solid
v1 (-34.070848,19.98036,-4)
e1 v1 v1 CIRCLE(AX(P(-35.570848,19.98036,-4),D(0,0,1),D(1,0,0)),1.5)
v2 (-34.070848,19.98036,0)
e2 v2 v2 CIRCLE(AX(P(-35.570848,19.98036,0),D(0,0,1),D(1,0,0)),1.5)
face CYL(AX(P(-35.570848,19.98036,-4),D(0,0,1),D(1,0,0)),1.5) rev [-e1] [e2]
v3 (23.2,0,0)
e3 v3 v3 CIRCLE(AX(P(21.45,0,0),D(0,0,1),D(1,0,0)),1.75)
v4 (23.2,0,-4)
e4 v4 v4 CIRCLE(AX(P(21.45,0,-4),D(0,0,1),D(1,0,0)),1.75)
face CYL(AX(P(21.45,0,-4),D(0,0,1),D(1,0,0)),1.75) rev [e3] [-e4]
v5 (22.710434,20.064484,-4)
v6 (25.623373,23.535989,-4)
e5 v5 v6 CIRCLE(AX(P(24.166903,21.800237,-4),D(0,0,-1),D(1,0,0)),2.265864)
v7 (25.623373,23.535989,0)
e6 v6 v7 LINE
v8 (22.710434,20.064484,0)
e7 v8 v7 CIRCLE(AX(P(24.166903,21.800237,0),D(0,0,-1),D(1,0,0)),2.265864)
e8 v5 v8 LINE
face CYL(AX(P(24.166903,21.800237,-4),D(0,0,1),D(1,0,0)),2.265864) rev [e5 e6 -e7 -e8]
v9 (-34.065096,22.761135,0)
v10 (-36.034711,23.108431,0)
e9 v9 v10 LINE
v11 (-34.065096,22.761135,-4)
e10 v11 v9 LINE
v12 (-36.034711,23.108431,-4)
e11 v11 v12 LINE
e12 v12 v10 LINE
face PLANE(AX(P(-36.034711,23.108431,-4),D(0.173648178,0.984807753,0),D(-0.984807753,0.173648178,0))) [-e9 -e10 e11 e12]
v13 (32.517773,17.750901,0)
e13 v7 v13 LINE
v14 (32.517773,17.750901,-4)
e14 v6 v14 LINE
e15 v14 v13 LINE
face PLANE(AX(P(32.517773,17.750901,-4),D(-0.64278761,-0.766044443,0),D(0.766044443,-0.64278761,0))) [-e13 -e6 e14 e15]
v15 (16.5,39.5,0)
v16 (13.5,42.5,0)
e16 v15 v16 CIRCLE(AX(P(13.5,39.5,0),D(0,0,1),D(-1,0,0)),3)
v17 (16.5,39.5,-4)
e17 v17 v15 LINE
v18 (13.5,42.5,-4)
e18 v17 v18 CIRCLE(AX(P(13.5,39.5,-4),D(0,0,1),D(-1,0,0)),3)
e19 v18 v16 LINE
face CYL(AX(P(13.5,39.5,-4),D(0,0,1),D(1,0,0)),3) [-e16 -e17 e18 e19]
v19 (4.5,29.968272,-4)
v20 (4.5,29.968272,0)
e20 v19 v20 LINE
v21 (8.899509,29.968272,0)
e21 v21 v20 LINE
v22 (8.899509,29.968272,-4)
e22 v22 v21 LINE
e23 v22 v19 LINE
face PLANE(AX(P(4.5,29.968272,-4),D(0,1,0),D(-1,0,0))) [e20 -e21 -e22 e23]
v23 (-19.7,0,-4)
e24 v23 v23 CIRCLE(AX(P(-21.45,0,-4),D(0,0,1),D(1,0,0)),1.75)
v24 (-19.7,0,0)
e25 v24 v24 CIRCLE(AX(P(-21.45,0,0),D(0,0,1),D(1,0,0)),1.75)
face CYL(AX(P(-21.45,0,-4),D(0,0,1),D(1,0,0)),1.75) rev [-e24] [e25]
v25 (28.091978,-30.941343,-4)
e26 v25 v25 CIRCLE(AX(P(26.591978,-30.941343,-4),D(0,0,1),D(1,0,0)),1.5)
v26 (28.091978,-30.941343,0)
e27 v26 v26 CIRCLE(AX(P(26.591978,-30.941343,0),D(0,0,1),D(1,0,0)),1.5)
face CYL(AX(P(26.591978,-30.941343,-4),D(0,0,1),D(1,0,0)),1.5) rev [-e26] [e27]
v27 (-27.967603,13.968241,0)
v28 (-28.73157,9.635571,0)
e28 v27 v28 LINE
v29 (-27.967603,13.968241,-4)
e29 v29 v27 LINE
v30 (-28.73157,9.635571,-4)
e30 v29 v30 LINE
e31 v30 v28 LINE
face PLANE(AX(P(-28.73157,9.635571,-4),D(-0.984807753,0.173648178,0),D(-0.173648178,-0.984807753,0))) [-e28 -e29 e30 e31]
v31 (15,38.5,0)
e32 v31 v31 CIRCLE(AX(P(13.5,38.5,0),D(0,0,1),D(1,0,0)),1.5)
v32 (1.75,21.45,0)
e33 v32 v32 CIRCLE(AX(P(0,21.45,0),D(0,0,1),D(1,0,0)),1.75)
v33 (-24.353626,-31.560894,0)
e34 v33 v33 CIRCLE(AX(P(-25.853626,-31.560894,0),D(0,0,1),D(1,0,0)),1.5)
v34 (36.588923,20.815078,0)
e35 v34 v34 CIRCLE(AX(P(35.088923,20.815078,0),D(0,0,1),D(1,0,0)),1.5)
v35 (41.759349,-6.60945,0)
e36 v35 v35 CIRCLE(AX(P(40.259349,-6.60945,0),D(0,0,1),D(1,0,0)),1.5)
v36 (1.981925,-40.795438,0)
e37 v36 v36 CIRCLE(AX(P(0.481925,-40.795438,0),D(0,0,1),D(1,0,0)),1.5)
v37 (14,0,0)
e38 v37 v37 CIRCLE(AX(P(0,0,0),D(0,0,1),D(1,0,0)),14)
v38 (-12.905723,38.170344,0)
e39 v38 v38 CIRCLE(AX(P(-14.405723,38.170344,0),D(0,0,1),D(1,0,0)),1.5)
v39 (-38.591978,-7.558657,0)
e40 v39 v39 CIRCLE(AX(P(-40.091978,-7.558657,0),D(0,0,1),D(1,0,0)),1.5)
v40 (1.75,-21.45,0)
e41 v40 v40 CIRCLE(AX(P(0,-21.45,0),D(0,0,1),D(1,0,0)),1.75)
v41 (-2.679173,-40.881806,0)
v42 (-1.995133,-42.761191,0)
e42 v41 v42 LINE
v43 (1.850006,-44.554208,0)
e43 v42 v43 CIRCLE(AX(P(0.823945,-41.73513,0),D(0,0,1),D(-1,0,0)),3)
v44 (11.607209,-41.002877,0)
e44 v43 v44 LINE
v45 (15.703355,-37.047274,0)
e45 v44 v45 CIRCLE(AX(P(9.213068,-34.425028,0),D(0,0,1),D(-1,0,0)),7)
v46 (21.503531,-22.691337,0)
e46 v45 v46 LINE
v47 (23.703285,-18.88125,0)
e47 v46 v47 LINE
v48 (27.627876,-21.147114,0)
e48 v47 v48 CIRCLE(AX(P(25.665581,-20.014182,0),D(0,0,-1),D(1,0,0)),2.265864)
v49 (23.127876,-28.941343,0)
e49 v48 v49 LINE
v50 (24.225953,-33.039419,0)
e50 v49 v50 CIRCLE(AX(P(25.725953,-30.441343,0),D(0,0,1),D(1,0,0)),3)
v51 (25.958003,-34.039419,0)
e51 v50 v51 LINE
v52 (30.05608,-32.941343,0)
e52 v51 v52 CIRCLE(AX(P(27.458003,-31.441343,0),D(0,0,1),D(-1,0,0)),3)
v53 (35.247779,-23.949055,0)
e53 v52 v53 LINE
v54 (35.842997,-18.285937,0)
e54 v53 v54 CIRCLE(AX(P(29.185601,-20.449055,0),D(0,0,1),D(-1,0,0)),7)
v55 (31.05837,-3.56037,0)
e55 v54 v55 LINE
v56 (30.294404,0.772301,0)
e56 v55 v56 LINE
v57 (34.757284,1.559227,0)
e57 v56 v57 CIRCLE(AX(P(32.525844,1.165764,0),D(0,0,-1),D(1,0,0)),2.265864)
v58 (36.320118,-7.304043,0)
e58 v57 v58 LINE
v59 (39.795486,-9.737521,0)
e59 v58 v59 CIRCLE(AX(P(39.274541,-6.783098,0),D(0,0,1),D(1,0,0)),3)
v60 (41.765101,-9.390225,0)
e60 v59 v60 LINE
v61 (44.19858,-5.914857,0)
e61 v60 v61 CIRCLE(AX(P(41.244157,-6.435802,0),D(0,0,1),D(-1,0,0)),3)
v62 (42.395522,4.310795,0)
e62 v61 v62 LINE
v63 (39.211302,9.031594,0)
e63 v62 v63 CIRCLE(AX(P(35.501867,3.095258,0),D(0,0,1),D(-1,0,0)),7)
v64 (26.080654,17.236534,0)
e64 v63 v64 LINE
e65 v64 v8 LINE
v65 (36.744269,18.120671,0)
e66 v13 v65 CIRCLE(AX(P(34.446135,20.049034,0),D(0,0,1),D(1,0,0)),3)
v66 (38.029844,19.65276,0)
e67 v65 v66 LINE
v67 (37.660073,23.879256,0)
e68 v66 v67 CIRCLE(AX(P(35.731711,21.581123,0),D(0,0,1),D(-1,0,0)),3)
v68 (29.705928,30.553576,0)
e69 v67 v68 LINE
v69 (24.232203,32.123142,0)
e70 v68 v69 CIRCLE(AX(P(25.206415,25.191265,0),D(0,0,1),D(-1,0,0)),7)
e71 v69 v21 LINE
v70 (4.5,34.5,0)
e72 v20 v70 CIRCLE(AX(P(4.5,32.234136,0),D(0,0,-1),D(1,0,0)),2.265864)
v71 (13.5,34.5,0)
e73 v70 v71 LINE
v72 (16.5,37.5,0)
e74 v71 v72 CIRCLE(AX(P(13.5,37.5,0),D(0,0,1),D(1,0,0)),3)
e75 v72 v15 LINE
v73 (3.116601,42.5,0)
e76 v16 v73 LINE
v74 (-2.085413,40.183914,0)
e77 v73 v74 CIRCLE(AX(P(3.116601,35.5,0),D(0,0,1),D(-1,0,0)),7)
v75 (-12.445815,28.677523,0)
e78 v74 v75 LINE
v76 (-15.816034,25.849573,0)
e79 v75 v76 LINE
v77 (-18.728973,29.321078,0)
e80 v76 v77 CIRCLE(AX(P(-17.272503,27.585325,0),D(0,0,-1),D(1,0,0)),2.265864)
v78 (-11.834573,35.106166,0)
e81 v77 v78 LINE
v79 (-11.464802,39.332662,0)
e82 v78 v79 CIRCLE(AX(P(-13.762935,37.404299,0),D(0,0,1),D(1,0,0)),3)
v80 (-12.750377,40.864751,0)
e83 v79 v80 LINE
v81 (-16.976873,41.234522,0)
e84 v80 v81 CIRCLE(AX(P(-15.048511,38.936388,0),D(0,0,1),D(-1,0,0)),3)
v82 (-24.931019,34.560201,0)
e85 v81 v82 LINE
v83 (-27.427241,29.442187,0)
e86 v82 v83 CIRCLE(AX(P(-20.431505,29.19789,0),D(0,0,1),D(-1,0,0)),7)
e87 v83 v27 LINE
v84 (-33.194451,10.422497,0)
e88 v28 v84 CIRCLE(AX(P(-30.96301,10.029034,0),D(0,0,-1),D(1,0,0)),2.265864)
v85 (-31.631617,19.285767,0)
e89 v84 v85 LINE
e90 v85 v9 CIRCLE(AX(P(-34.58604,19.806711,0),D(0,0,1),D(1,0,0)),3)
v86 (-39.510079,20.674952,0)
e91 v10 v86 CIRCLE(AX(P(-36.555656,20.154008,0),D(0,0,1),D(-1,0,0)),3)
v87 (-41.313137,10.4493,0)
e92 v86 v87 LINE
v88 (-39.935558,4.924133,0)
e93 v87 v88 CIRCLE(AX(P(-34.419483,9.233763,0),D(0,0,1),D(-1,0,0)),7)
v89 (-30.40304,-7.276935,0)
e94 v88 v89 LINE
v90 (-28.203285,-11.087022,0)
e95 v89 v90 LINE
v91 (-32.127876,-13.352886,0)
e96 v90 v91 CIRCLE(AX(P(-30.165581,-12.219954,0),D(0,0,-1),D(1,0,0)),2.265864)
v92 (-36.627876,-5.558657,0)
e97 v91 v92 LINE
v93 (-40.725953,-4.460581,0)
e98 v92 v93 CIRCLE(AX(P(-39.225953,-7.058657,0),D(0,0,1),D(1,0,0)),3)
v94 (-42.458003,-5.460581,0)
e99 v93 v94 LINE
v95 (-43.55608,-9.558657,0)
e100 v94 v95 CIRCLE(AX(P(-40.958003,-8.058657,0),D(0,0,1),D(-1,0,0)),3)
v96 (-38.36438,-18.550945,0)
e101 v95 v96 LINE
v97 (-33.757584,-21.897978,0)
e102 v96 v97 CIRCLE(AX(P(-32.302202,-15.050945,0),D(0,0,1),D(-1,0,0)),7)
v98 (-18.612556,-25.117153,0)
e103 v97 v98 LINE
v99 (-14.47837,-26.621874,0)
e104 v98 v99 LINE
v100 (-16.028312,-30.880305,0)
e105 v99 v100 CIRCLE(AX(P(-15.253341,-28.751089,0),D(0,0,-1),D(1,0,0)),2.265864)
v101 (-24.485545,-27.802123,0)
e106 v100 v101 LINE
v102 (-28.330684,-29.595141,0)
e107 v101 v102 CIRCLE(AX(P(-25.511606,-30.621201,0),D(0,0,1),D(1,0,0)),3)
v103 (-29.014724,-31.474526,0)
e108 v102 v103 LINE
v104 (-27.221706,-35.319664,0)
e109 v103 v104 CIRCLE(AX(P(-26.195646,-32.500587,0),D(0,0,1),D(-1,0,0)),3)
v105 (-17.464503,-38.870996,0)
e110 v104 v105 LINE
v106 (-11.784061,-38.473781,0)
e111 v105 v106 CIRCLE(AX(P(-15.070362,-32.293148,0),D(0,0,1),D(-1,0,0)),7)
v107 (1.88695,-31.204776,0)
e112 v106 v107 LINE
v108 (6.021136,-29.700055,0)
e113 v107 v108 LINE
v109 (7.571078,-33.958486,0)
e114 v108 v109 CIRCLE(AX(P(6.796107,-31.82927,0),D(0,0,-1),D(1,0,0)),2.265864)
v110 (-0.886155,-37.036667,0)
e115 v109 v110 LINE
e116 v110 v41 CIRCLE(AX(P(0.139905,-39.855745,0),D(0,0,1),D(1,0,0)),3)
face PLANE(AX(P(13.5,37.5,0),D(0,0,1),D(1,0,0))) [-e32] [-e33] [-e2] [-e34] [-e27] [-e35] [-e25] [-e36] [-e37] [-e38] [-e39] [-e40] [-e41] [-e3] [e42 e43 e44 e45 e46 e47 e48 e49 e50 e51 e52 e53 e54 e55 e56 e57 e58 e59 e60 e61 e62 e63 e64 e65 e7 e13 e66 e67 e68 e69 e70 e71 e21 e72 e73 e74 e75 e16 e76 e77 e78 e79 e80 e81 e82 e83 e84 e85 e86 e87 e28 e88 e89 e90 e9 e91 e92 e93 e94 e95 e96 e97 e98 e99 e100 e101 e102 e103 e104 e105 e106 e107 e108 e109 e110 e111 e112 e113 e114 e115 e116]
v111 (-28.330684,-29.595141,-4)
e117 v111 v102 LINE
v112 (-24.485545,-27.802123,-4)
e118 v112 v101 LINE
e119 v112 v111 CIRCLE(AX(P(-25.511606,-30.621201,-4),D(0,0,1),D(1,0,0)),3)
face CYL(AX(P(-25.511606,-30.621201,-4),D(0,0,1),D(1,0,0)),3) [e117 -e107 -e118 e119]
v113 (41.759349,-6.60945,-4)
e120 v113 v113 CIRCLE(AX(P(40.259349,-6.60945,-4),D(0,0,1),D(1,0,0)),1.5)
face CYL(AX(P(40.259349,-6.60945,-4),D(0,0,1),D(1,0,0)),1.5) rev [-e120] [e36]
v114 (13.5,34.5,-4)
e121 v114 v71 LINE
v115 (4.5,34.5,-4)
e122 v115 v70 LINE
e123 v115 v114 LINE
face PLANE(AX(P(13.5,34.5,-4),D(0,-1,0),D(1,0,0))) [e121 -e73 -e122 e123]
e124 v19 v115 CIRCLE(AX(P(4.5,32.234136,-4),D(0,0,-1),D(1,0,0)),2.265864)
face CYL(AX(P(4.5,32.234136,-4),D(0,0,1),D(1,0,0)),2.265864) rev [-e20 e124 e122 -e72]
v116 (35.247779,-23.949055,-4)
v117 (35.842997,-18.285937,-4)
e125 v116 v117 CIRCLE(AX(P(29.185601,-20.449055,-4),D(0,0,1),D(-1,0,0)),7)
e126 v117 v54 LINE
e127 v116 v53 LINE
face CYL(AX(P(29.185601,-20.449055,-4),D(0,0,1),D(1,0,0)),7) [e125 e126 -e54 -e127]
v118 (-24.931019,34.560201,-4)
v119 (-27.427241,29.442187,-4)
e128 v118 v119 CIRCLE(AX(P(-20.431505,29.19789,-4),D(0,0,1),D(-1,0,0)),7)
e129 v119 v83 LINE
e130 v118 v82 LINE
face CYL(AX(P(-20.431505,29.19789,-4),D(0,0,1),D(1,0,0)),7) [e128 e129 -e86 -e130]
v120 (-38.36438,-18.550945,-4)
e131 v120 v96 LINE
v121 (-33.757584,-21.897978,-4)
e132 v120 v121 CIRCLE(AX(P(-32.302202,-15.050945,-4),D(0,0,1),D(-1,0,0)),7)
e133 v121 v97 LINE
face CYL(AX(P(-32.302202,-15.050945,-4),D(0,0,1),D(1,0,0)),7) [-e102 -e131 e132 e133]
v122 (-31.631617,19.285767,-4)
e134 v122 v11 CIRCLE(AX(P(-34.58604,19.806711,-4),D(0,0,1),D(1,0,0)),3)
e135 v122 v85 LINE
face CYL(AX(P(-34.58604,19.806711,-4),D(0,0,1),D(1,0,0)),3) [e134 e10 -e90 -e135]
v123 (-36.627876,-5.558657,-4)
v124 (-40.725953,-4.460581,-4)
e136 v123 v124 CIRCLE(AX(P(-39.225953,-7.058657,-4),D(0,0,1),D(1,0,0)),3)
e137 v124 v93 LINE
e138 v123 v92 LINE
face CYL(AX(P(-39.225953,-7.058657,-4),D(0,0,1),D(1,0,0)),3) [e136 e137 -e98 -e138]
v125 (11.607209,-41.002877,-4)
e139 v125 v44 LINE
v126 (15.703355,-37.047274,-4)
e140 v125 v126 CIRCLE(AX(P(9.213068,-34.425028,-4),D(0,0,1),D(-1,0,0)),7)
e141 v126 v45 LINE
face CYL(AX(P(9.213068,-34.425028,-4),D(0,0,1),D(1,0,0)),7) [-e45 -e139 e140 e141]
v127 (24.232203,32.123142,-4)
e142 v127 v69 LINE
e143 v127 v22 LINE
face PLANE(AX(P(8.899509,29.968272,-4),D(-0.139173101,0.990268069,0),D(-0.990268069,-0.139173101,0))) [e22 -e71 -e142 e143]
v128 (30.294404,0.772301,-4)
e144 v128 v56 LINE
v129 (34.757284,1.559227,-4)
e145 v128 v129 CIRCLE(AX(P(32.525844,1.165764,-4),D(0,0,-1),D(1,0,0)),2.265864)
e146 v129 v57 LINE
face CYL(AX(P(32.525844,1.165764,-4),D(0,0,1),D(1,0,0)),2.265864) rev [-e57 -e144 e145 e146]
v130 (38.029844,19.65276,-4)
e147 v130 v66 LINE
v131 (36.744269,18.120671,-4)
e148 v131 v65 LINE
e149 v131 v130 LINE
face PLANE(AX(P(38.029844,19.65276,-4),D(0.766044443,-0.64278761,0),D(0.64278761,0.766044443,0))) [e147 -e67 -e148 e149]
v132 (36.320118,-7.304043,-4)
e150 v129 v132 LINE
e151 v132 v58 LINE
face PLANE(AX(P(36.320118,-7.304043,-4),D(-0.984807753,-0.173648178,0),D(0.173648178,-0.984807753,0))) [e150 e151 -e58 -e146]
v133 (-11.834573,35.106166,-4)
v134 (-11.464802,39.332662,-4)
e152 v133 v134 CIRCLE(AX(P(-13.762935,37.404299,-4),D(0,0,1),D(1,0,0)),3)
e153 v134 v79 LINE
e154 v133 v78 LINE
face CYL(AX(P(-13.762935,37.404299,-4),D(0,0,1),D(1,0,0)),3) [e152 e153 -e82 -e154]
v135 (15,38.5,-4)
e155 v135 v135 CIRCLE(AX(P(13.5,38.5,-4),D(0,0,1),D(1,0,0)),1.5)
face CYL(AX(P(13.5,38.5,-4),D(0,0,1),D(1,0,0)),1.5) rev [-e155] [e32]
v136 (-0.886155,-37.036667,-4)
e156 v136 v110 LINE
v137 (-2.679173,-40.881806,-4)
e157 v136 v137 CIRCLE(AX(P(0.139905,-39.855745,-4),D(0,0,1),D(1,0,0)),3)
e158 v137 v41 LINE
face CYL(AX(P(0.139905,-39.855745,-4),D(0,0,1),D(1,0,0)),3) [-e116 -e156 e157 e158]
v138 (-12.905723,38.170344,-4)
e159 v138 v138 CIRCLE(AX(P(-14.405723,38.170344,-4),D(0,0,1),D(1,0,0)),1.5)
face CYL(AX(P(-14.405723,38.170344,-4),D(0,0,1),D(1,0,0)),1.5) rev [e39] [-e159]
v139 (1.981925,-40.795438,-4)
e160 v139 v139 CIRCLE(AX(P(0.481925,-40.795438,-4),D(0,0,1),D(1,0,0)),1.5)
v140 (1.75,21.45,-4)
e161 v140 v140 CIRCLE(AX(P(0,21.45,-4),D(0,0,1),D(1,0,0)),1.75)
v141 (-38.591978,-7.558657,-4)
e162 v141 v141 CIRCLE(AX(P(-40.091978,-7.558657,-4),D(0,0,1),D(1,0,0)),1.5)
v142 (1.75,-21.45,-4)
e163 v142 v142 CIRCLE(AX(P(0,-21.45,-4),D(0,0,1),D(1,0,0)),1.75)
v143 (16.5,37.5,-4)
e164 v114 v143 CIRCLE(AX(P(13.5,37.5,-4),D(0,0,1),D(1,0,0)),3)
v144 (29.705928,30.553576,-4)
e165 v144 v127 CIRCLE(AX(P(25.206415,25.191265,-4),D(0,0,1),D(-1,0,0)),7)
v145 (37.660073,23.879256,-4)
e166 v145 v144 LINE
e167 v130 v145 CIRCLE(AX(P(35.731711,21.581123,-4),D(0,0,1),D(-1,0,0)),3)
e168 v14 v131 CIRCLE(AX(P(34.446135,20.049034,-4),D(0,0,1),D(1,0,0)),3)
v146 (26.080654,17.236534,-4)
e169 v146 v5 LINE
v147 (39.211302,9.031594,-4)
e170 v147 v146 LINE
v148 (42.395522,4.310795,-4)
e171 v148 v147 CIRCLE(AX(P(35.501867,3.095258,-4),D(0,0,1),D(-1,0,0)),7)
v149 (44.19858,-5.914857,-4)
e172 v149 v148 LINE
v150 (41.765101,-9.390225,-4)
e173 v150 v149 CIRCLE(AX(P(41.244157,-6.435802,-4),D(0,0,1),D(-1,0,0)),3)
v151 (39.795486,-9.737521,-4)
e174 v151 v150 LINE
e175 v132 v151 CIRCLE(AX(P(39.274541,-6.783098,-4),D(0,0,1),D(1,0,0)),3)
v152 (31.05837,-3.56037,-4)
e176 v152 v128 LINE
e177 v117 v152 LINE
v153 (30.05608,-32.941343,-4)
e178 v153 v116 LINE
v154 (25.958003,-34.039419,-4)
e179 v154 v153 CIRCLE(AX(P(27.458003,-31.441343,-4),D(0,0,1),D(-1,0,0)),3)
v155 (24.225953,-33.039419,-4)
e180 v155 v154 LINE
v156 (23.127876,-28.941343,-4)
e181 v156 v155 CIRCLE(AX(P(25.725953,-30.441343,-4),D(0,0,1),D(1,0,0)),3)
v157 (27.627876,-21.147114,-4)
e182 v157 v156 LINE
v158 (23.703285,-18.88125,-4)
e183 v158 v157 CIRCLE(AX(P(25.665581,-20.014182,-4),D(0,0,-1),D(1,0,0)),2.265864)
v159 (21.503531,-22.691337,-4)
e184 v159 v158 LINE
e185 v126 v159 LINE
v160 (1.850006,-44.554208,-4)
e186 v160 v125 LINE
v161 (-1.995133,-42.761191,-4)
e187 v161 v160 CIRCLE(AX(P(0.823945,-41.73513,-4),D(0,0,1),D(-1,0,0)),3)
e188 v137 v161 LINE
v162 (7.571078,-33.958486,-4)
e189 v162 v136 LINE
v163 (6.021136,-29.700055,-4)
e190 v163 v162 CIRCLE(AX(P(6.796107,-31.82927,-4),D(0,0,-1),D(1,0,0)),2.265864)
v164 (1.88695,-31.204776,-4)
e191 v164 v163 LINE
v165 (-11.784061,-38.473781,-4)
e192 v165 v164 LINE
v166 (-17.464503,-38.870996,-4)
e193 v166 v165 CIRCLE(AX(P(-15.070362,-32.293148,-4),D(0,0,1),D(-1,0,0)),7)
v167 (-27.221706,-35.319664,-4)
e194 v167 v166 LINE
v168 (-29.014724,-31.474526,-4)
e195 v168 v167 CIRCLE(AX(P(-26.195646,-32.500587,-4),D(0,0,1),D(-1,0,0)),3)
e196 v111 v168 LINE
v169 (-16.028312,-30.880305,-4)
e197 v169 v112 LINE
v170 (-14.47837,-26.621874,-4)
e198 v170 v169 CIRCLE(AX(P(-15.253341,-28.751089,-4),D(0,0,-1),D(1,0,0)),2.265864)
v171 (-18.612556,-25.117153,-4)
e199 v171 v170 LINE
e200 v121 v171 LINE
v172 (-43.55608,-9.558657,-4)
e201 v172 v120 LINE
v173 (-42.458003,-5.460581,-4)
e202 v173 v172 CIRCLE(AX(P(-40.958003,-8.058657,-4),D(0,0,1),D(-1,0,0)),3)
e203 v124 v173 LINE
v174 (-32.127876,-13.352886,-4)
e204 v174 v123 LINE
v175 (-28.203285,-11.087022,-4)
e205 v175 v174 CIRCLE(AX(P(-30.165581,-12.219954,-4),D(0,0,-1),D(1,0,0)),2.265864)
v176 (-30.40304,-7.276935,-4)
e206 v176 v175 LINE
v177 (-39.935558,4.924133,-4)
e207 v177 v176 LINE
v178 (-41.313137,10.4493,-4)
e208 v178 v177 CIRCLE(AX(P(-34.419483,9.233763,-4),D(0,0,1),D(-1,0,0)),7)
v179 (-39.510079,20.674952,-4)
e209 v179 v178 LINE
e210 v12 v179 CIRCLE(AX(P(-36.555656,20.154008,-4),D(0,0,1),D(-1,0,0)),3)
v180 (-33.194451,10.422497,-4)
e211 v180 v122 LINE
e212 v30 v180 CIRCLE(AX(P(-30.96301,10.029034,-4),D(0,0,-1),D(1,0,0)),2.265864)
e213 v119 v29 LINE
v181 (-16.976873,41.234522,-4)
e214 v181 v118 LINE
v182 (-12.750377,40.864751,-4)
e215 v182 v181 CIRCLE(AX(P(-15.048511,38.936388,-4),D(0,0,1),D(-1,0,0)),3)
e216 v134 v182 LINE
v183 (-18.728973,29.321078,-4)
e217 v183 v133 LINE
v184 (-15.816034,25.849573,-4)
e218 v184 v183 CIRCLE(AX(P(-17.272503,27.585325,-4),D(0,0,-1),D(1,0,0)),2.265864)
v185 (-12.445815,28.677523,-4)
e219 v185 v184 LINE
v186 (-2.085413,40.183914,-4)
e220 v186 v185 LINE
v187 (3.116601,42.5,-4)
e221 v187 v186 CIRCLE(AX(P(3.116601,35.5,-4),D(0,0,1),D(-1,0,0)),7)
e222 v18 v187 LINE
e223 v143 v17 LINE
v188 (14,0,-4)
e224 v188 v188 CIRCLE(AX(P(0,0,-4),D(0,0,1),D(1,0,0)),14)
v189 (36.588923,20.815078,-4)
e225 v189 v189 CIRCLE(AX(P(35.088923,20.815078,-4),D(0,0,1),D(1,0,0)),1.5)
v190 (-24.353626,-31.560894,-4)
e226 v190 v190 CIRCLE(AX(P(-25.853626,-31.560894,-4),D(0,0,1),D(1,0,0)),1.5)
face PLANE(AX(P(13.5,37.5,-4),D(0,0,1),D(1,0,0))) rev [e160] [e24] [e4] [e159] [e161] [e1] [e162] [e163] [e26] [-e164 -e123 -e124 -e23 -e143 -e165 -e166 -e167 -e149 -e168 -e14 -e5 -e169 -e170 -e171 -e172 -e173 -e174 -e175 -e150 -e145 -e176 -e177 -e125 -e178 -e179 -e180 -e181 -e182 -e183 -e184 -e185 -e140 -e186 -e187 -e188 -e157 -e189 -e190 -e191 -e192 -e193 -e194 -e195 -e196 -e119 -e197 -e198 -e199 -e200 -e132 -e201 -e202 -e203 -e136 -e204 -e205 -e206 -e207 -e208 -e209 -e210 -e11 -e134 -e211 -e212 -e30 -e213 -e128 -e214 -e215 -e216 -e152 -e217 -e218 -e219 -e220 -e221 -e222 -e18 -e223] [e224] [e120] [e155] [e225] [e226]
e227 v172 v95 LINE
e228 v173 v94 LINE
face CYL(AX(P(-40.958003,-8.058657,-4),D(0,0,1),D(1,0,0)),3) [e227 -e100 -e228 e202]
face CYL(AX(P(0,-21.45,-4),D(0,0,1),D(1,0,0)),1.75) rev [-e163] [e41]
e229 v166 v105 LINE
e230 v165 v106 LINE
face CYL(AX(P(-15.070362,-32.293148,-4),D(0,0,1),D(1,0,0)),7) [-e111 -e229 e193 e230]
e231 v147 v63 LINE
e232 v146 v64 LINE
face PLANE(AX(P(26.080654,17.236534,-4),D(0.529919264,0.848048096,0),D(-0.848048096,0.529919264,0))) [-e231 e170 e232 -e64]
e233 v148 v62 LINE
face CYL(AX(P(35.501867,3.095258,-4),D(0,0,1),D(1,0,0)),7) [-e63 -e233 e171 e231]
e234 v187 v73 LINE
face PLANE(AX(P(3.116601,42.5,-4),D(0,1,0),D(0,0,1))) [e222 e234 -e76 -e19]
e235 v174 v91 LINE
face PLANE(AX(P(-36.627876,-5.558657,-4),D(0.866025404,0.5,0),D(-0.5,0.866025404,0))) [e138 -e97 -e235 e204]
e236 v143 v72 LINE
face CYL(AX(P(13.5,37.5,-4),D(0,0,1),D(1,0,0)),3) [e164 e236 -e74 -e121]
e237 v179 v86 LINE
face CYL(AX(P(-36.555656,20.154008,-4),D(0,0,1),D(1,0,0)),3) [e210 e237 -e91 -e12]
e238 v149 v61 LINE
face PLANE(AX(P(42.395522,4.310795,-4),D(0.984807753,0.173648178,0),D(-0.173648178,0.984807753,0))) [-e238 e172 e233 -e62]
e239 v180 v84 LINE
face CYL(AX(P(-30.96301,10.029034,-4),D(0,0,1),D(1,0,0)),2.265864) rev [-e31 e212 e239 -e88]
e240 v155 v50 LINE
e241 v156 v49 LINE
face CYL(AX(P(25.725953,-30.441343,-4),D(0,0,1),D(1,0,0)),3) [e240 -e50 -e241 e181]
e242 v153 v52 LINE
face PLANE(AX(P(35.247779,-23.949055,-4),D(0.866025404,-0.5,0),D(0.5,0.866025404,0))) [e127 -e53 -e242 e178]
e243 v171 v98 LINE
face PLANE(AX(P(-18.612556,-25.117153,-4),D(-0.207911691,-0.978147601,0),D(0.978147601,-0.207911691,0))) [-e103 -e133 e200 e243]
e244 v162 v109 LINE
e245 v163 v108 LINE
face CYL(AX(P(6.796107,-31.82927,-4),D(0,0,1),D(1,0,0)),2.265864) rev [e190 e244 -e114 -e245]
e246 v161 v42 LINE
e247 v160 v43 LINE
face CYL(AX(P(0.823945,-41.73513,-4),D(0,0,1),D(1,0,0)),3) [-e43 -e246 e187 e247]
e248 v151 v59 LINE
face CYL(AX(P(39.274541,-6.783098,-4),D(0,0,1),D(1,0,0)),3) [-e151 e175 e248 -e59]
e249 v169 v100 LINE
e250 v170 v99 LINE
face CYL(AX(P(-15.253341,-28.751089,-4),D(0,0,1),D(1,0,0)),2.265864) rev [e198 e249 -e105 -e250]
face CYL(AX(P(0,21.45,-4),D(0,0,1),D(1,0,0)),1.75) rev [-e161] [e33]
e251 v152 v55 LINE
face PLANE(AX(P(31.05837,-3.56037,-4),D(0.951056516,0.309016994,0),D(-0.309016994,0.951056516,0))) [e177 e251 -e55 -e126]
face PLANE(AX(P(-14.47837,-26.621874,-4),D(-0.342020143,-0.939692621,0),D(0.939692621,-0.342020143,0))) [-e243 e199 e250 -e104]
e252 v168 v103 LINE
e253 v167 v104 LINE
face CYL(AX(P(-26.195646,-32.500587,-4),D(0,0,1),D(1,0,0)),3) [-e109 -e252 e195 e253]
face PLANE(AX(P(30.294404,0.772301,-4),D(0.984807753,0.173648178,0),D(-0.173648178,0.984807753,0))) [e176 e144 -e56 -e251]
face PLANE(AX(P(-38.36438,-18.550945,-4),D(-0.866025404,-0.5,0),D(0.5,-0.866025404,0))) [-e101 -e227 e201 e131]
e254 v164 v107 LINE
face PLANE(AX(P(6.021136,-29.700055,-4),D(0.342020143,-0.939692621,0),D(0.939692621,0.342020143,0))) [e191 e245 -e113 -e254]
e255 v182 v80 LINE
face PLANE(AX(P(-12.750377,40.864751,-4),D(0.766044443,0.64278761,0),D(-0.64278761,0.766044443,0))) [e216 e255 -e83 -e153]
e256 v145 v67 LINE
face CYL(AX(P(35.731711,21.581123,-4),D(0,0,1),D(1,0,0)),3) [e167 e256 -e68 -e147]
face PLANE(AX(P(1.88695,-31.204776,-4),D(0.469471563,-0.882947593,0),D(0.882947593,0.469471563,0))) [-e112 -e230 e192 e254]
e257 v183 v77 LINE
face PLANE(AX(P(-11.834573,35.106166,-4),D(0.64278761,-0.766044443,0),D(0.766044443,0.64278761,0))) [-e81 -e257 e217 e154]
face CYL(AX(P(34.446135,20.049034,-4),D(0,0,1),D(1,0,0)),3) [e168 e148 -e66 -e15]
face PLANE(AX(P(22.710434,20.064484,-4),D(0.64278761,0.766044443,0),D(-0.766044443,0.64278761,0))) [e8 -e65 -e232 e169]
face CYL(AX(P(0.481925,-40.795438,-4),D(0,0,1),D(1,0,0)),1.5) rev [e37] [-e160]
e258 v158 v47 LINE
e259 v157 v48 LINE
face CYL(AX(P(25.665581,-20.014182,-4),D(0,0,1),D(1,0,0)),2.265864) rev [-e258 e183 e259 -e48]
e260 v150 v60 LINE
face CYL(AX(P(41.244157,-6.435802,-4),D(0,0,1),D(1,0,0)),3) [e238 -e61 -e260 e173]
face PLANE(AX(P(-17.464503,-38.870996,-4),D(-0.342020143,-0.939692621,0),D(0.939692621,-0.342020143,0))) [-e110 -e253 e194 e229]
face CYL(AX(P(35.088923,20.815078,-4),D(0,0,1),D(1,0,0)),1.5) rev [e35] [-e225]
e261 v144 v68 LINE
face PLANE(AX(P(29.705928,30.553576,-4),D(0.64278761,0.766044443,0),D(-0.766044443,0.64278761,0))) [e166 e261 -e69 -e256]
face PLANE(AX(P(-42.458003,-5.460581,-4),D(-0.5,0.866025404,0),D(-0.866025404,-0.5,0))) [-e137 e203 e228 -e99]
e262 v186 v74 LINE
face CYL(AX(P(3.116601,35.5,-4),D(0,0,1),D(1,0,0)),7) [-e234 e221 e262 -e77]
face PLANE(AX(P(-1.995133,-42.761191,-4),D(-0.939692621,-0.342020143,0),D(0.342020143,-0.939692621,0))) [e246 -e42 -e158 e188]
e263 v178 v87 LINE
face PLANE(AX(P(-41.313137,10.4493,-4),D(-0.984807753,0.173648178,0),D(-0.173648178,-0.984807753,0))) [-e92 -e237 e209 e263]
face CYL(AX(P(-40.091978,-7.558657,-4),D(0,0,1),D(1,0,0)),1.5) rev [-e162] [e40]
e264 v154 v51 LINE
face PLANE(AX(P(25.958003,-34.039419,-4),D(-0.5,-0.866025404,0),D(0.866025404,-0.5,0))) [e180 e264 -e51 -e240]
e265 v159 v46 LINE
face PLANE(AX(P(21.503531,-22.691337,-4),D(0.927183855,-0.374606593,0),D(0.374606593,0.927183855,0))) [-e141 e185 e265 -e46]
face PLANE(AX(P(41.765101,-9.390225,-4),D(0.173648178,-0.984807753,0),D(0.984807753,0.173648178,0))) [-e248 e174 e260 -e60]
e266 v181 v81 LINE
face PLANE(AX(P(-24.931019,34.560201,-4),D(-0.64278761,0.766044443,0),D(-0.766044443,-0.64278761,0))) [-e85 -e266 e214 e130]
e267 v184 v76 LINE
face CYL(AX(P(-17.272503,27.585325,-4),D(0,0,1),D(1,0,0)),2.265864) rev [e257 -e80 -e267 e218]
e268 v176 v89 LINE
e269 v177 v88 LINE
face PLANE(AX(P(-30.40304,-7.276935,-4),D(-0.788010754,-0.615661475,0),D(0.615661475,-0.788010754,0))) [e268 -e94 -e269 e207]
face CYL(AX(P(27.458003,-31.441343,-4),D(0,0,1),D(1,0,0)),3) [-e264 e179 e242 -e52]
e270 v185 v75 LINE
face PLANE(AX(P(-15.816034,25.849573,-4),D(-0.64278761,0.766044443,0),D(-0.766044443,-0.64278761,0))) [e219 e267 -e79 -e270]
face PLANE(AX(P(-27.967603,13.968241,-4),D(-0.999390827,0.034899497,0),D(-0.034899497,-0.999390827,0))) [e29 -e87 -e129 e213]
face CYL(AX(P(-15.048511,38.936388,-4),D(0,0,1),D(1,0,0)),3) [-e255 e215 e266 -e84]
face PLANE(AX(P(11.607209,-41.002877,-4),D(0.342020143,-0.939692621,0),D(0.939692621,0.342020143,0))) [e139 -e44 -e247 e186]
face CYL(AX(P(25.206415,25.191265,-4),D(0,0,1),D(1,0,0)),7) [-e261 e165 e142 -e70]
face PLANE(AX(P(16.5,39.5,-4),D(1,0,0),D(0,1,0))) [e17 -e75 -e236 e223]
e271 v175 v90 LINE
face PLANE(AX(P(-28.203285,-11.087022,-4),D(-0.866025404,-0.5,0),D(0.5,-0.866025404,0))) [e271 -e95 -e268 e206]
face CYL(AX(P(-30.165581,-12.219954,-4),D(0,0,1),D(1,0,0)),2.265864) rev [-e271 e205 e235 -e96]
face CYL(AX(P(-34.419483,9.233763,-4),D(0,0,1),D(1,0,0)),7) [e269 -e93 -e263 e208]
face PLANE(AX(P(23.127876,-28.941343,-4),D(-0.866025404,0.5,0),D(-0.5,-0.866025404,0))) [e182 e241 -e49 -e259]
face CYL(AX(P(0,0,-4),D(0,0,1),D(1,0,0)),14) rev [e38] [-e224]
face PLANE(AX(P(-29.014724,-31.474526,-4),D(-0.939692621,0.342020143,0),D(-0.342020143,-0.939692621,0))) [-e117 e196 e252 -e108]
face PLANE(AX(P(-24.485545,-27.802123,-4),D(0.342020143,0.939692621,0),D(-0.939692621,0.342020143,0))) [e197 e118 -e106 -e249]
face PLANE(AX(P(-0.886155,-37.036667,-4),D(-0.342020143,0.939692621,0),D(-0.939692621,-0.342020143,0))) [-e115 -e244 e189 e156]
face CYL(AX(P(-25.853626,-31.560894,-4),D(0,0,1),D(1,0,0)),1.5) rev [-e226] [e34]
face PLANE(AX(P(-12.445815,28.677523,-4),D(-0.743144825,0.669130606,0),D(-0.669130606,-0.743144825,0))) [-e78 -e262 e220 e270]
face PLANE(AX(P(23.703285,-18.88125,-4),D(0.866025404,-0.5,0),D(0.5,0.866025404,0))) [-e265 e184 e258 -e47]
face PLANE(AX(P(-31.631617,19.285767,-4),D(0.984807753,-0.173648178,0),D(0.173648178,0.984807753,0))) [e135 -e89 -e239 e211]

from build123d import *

# Parameters (mm, degrees)
SKETCH1_R          = 14
SKETCH1_R_2        = 1.75
SKETCH1_R_3        = 1.5
BASE_FLANGE1_DEPTH = 4


# Sheet-metal steps are written as plain solids
with BuildPart() as part:
    # Sketch1 → Base-Flange1 (new body)
    with BuildSketch(Plane.XY):
        with BuildLine():
            Line((-12.445814591, 28.677522558), (-2.085412981, 40.183914245))
            ThreePointArc((-2.085412981, 40.183914245), (0.269444296, 41.894818203), (3.116600797, 42.5))
            Line((3.116600797, 42.5), (13.5, 42.5))
            ThreePointArc((13.5, 42.5), (15.621320344, 41.621320344), (16.5, 39.5))
            Line((16.5, 39.5), (16.5, 37.5))
            ThreePointArc((16.5, 37.5), (15.621320344, 35.378679656), (13.5, 34.5))
            Line((13.5, 34.5), (4.5, 34.5))
            ThreePointArc((4.5, 34.5), (2.234136105, 32.234136105), (4.5, 29.96827221))
            Line((4.5, 29.96827221), (8.899509069, 29.96827221))
            Line((8.899509069, 29.96827221), (24.232203159, 32.123141835))
            ThreePointArc((24.232203159, 32.123141835), (27.135876357, 31.920097226), (29.705928134, 30.553576456))
            Line((29.705928134, 30.553576456), (37.660073394, 23.879256102))
            ThreePointArc((37.660073394, 23.879256102), (38.720294659, 21.842590001), (38.029843894, 19.652759943))
            Line((38.029843894, 19.652759943), (36.744268675, 18.120671057))
            ThreePointArc((36.744268675, 18.120671057), (34.707602574, 17.060449792), (32.517772516, 17.750900557))
            Line((32.517772516, 17.750900557), (25.623372528, 23.535989044))
            ThreePointArc((25.623372528, 23.535989044), (22.431150845, 23.256705835), (22.710434054, 20.064484152))
            Line((22.710434054, 20.064484152), (26.080653529, 17.236534234))
            Line((26.080653529, 17.236534234), (39.211302131, 9.031594352))
            ThreePointArc((39.211302131, 9.031594352), (41.305130289, 7.009608003), (42.395521552, 4.310794923))
            Line((42.395521552, 4.310794923), (44.198579902, -5.914857115))
            ThreePointArc((44.198579902, -5.914857115), (43.701612775, -8.156530957), (41.765101175, -9.390224907))
            Line((41.765101175, -9.390224907), (39.795485669, -9.737521262))
            ThreePointArc((39.795485669, -9.737521262), (37.553811827, -9.240554136), (36.320117877, -7.304042536))
            Line((36.320117877, -7.304042536), (34.757284278, 1.559227241))
            ThreePointArc((34.757284278, 1.559227241), (32.132380811, 3.397204436), (30.294403616, 0.772300968))
            Line((30.294403616, 0.772300968), (31.058370348, -3.560369672))
            Line((31.058370348, -3.560369672), (35.84299705, -18.285936503))
            ThreePointArc((35.84299705, -18.285936503), (36.147254703, -21.180754707), (35.247779262, -23.949055464))
            Line((35.247779262, -23.949055464), (30.056079661, -32.941342951))
            ThreePointArc((30.056079661, -32.941342951), (28.234460585, -34.33912043), (25.958003449, -34.039419162))
            Line((25.958003449, -34.039419162), (24.225952642, -33.039419162))
            ThreePointArc((24.225952642, -33.039419162), (22.828175163, -31.217800086), (23.127876431, -28.941342951))
            Line((23.127876431, -28.941342951), (27.627876431, -21.147114317))
            ThreePointArc((27.627876431, -21.147114317), (26.798512683, -18.051886675), (23.703285041, -18.881250422))
            Line((23.703285041, -18.881250422), (21.503530506, -22.69133704))
            Line((21.503530506, -22.69133704), (15.703355299, -37.047274443))
            ThreePointArc((15.703355299, -37.047274443), (14.07567691, -39.460406892), (11.60720932, -41.002876635))
            Line((11.60720932, -41.002876635), (1.850005711, -44.554208318))
            ThreePointArc((1.850005711, -44.554208318), (-0.443909504, -44.454053817), (-1.995132582, -42.761190886))
            Line((-1.995132582, -42.761190886), (-2.679172868, -40.881805644))
            ThreePointArc((-2.679172868, -40.881805644), (-2.579018367, -38.587890429), (-0.886155436, -37.036667352))
            Line((-0.886155436, -37.036667352), (7.571078151, -33.958486062))
            ThreePointArc((7.571078151, -33.958486062), (8.925322639, -31.054299386), (6.021135963, -29.700054898))
            Line((6.021135963, -29.700054898), (1.886949755, -31.20477562))
            Line((1.886949755, -31.20477562), (-11.78406092, -38.473780937))
            ThreePointArc((-11.78406092, -38.473780937), (-14.582066543, -39.276096138), (-17.464502862, -38.870996132))
            Line((-17.464502862, -38.870996132), (-27.221706472, -35.319664448))
            ThreePointArc((-27.221706472, -35.319664448), (-28.914569403, -33.768441371), (-29.014723904, -31.474526156))
            Line((-29.014723904, -31.474526156), (-28.330683618, -29.595140915))
            ThreePointArc((-28.330683618, -29.595140915), (-26.779460541, -27.902277983), (-24.485545325, -27.802123482))
            Line((-24.485545325, -27.802123482), (-16.028311738, -30.880304772))
            ThreePointArc((-16.028311738, -30.880304772), (-13.124125062, -29.526060284), (-14.47836955, -26.621873608))
            Line((-14.47836955, -26.621873608), (-18.612555757, -25.117152886))
            Line((-18.612555757, -25.117152886), (-33.757584069, -21.897977741))
            ThreePointArc((-33.757584069, -21.897977741), (-36.416698999, -20.714063497), (-38.364380059, -18.550944536))
            Line((-38.364380059, -18.550944536), (-43.556079661, -9.558657049))
            ThreePointArc((-43.556079661, -9.558657049), (-43.855780928, -7.282199914), (-42.458003449, -5.460580838))
            Line((-42.458003449, -5.460580838), (-40.725952642, -4.460580838))
            ThreePointArc((-40.725952642, -4.460580838), (-38.449495507, -4.16087957), (-36.627876431, -5.558657049))
            Line((-36.627876431, -5.558657049), (-32.127876431, -13.352885683))
            ThreePointArc((-32.127876431, -13.352885683), (-29.032648788, -14.18224943), (-28.203285041, -11.087021788))
            Line((-28.203285041, -11.087021788), (-30.403039576, -7.27693517))
            Line((-30.403039576, -7.27693517), (-39.935558458, 4.924132608))
            ThreePointArc((-39.935558458, 4.924132608), (-41.211553267, 7.540309666), (-41.313137454, 10.449300179))
            Line((-41.313137454, 10.449300179), (-39.510079105, 20.674952217))
            ThreePointArc((-39.510079105, 20.674952217), (-38.276385155, 22.611463816), (-36.034711312, 23.108430943))
            Line((-36.034711312, 23.108430943), (-34.065095806, 22.761134587))
            ThreePointArc((-34.065095806, 22.761134587), (-32.128584207, 21.527440637), (-31.63161708, 19.285766795))
            Line((-31.63161708, 19.285766795), (-33.194450679, 10.422497018))
            ThreePointArc((-33.194450679, 10.422497018), (-31.356473484, 7.797593551), (-28.731570017, 9.635570746))
            Line((-28.731570017, 9.635570746), (-27.967603284, 13.968241386))
            Line((-27.967603284, 13.968241386), (-27.427241211, 29.442186584))
            ThreePointArc((-27.427241211, 29.442186584), (-26.723063746, 32.266488135), (-24.93101869, 34.560201209))
            Line((-24.93101869, 34.560201209), (-16.97687343, 41.234521563))
            ThreePointArc((-16.97687343, 41.234521563), (-14.787043372, 41.924972328), (-12.750377271, 40.864751063))
            Line((-12.750377271, 40.864751063), (-11.464802052, 39.332662177))
            ThreePointArc((-11.464802052, 39.332662177), (-10.774351287, 37.142832119), (-11.834572552, 35.106166018))
            Line((-11.834572552, 35.106166018), (-18.72897254, 29.321077531))
            ThreePointArc((-18.72897254, 29.321077531), (-19.008255749, 26.128855848), (-15.816034066, 25.84957264))
            Line((-15.816034066, 25.84957264), (-12.445814591, 28.677522558))
        make_face()
        Circle(SKETCH1_R, mode=Mode.SUBTRACT)
        with Locations((0, 21.45)):
            Circle(SKETCH1_R_2, mode=Mode.SUBTRACT)
        with Locations((21.45, 0)):
            Circle(SKETCH1_R_2, mode=Mode.SUBTRACT)
        with Locations((0, -21.45)):
            Circle(SKETCH1_R_2, mode=Mode.SUBTRACT)
        with Locations((-21.45, 0)):
            Circle(SKETCH1_R_2, mode=Mode.SUBTRACT)
        with Locations((13.5, 38.5)):
            Circle(SKETCH1_R_3, mode=Mode.SUBTRACT)
        with Locations((35.088922955, 20.815078329)):
            Circle(SKETCH1_R_3, mode=Mode.SUBTRACT)
        with Locations((40.259348889, -6.609449825)):
            Circle(SKETCH1_R_3, mode=Mode.SUBTRACT)
        with Locations((26.591978046, -30.941342951)):
            Circle(SKETCH1_R_3, mode=Mode.SUBTRACT)
        with Locations((0.481925137, -40.795437835)):
            Circle(SKETCH1_R_3, mode=Mode.SUBTRACT)
        with Locations((-25.853625899, -31.560893965)):
            Circle(SKETCH1_R_3, mode=Mode.SUBTRACT)
        with Locations((-40.091978046, -7.558657049)):
            Circle(SKETCH1_R_3, mode=Mode.SUBTRACT)
        with Locations((-35.570848092, 19.980359506)):
            Circle(SKETCH1_R_3, mode=Mode.SUBTRACT)
        with Locations((-14.405722991, 38.170343791)):
            Circle(SKETCH1_R_3, mode=Mode.SUBTRACT)
    extrude(amount=-BASE_FLANGE1_DEPTH)


solid = part.part
